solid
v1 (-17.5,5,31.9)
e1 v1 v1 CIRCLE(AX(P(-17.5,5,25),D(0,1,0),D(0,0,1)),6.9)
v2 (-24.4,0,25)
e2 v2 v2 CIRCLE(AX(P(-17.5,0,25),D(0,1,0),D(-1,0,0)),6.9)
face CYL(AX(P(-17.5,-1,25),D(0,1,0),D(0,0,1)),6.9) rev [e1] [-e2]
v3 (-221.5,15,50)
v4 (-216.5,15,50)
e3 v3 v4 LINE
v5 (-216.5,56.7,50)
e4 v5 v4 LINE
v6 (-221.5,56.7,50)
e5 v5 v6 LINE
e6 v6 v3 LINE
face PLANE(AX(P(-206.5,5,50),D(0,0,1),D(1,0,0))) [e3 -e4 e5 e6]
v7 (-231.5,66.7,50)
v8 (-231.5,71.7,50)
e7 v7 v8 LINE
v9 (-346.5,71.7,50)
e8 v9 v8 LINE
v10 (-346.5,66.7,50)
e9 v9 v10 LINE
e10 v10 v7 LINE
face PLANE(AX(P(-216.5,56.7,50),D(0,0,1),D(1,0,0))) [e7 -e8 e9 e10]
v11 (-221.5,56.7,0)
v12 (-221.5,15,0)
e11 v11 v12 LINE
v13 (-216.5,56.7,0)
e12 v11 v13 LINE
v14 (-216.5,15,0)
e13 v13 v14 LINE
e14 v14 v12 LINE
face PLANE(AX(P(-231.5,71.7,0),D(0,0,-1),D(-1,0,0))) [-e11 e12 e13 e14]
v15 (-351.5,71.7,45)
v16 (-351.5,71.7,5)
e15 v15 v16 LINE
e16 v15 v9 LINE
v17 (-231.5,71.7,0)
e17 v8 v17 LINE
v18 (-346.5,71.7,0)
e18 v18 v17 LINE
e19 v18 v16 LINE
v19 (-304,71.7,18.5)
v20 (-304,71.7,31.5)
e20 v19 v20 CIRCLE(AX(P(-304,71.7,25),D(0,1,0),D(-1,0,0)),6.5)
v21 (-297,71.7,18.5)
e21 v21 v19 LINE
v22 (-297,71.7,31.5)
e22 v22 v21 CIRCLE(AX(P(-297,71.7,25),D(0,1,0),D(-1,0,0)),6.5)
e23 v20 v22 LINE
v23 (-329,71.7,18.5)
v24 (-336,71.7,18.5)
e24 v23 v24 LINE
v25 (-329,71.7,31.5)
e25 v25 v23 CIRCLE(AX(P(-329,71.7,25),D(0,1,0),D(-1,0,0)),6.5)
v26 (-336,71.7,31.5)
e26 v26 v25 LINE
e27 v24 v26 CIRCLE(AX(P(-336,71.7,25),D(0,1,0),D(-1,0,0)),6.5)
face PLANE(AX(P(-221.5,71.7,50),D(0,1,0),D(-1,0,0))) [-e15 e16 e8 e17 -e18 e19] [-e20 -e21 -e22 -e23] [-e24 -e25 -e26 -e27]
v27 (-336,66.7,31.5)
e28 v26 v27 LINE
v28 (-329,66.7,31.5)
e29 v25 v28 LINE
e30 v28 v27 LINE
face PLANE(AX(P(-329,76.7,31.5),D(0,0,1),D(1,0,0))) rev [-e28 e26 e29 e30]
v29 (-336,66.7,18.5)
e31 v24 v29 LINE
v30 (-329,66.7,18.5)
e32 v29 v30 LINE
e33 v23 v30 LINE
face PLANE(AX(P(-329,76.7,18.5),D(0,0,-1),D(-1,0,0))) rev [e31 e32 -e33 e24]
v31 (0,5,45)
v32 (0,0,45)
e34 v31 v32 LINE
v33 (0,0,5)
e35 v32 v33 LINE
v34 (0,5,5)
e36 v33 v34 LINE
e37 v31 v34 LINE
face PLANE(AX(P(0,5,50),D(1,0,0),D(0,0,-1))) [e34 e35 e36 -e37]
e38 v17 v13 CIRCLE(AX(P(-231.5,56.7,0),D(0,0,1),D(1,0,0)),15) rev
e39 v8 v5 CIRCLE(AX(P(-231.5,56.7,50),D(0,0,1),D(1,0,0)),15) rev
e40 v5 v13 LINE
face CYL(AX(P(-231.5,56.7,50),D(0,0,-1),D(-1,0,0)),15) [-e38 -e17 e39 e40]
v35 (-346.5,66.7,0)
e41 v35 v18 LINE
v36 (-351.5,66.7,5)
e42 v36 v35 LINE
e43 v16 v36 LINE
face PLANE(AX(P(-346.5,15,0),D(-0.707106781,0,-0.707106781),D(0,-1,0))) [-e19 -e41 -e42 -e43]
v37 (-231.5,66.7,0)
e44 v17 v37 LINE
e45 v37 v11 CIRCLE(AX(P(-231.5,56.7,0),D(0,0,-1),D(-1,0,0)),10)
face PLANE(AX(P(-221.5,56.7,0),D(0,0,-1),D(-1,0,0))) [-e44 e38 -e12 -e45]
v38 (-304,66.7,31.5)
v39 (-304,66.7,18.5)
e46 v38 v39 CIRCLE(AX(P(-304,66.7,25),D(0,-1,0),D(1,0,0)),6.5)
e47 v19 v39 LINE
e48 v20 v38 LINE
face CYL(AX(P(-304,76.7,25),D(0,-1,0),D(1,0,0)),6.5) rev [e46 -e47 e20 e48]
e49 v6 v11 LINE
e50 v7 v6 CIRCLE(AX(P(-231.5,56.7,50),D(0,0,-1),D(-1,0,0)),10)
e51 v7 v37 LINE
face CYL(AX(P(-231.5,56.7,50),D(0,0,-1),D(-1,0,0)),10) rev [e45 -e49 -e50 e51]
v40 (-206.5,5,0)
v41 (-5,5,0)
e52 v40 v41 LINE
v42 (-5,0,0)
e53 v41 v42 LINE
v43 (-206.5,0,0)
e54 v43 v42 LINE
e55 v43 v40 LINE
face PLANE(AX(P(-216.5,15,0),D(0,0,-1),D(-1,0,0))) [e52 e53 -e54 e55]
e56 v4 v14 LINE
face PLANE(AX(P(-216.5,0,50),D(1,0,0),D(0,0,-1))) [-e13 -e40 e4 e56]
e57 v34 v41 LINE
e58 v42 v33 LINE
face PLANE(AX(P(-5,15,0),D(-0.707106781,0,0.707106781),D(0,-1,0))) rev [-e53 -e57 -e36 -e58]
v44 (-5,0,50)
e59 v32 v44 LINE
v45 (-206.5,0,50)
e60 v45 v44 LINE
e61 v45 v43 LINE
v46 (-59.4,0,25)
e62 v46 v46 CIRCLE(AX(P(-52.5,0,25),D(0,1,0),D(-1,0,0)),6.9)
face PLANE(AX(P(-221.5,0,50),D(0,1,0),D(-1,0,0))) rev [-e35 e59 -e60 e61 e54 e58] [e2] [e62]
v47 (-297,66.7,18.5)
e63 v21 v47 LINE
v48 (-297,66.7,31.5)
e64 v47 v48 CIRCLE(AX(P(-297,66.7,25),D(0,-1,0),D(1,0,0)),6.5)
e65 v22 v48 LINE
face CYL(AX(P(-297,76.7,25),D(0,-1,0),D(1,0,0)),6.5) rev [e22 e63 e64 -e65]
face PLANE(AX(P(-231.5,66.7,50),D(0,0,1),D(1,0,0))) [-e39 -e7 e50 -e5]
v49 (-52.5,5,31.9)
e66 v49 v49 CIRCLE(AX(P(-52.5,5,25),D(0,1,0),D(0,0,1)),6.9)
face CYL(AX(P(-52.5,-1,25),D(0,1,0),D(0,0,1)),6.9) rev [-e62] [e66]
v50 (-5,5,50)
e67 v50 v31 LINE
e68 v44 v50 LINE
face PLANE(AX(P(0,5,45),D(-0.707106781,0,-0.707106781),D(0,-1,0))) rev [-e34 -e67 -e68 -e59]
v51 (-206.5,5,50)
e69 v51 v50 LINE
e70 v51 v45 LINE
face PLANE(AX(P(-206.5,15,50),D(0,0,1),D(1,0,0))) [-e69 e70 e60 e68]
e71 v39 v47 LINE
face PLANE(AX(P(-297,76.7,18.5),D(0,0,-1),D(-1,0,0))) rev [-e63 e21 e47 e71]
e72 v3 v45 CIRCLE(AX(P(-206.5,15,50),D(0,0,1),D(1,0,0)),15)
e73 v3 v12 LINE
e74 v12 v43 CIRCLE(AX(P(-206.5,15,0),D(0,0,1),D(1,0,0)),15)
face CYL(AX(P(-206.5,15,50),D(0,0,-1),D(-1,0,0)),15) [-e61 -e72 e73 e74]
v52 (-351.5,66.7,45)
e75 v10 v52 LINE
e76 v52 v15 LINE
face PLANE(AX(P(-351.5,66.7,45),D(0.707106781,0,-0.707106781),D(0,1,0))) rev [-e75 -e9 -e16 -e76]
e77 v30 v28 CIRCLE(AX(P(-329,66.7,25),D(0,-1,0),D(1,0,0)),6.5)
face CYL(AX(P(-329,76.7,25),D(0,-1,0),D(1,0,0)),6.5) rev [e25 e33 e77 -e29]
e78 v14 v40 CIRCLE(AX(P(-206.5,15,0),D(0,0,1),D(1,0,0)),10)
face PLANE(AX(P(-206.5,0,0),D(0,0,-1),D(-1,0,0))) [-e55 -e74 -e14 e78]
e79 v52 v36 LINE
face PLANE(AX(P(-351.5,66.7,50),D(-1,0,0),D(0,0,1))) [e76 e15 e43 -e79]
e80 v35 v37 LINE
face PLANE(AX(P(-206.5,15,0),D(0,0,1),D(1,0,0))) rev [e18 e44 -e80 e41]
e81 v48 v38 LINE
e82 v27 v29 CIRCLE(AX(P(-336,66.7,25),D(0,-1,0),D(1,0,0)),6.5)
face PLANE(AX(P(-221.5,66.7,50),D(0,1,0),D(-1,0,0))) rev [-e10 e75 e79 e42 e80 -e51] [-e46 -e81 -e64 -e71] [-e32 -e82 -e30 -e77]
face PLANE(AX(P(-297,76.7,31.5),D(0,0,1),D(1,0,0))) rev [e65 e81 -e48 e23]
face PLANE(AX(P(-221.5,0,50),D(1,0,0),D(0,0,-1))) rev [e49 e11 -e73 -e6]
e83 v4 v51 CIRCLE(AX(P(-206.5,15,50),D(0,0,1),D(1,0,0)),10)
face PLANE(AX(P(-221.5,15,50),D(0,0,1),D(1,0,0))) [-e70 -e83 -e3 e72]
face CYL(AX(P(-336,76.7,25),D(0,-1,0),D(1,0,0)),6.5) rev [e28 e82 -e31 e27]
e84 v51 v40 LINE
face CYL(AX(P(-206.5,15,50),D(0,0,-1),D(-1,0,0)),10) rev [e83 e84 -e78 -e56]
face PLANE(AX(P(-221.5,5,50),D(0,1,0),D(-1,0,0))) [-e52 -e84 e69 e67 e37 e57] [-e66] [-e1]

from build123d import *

# Parameters (mm, degrees)
SM_BASE_FLANGE_1_DEPTH = 50
SKETCH_3_R             = 6.9
CUT_EXTRUDE_2_DEPTH    = 10
OTHER_1_DEPTH          = 71.7
CUT_EXTRUDE_3_DEPTH    = 10


# Read off the part's stored shape, not the designer's step: Затупленный угол1
# Sheet-metal steps are written as plain solids
with BuildPart() as part:
    # Sketch 1 → Базовая кромка1 (new body)
    with BuildSketch(Plane.XY):
        with BuildLine():
            Line((-351.5, 66.7), (-231.5, 66.7))
            ThreePointArc((-231.5, 66.7), (-224.428932188, 63.771067812), (-221.5, 56.7))
            Line((-221.5, 56.7), (-221.5, 15))
            ThreePointArc((-221.5, 15), (-217.106601718, 4.393398282), (-206.5, 0))
            Line((-206.5, 0), (0, 0))
            Line((0, 0), (0, 5))
            Line((0, 5), (-206.5, 5))
            ThreePointArc((-206.5, 5), (-213.571067812, 7.928932188), (-216.5, 15))
            Line((-216.5, 15), (-216.5, 56.7))
            ThreePointArc((-216.5, 56.7), (-220.893398282, 67.306601718), (-231.5, 71.7))
            Line((-231.5, 71.7), (-351.5, 71.7))
            Line((-351.5, 71.7), (-351.5, 66.7))
        make_face()
    extrude(amount=SM_BASE_FLANGE_1_DEPTH)

    # Эскиз3 → Вырез-Вытянуть2 (cut)
    with BuildSketch(Plane(origin=(0, 5, 0), x_dir=(1, 0, 0), z_dir=(0, 1, 0))):
        with Locations(Location((-17.5, -25, 0), (0, 0, 270))):
            Circle(SKETCH_3_R)
        with Locations(Location((-52.5, -25, 0), (0, 0, 270))):
            Circle(SKETCH_3_R)
    extrude(amount=-CUT_EXTRUDE_2_DEPTH, mode=Mode.SUBTRACT)

    # Other 1 outline → Other 1 (cut)
    with BuildSketch(Plane(origin=(0, 0, 0), x_dir=(1, 0, 0), z_dir=(0, 1, 0))):
        Polygon((0, 0), (-5, 0), (0, -5), align=None)
        Polygon((0, -50), (0, -45), (-5, -50), align=None)
        Polygon((-346.5, -50), (-351.5, -45), (-351.5, -50), align=None)
        Polygon((-351.5, -5), (-346.5, 0), (-351.5, 0), align=None)
    extrude(amount=OTHER_1_DEPTH, mode=Mode.SUBTRACT)

    # Эскиз4 → Вырез-Вытянуть3 (cut)
    with BuildSketch(Plane.XZ.offset(-66.7)):
        with BuildLine():
            Line((-329, 18.5), (-336, 18.5))
            ThreePointArc((-336, 18.5), (-342.5, 25), (-336, 31.5))
            Line((-336, 31.5), (-329, 31.5))
            ThreePointArc((-329, 31.5), (-322.5, 25), (-329, 18.5))
        make_face()
        with BuildLine():
            Line((-297, 18.5), (-304, 18.5))
            ThreePointArc((-304, 18.5), (-310.5, 25), (-304, 31.5))
            Line((-304, 31.5), (-297, 31.5))
            ThreePointArc((-297, 31.5), (-290.5, 25), (-297, 18.5))
        make_face()
    extrude(amount=-CUT_EXTRUDE_3_DEPTH, mode=Mode.SUBTRACT)


solid = part.part
